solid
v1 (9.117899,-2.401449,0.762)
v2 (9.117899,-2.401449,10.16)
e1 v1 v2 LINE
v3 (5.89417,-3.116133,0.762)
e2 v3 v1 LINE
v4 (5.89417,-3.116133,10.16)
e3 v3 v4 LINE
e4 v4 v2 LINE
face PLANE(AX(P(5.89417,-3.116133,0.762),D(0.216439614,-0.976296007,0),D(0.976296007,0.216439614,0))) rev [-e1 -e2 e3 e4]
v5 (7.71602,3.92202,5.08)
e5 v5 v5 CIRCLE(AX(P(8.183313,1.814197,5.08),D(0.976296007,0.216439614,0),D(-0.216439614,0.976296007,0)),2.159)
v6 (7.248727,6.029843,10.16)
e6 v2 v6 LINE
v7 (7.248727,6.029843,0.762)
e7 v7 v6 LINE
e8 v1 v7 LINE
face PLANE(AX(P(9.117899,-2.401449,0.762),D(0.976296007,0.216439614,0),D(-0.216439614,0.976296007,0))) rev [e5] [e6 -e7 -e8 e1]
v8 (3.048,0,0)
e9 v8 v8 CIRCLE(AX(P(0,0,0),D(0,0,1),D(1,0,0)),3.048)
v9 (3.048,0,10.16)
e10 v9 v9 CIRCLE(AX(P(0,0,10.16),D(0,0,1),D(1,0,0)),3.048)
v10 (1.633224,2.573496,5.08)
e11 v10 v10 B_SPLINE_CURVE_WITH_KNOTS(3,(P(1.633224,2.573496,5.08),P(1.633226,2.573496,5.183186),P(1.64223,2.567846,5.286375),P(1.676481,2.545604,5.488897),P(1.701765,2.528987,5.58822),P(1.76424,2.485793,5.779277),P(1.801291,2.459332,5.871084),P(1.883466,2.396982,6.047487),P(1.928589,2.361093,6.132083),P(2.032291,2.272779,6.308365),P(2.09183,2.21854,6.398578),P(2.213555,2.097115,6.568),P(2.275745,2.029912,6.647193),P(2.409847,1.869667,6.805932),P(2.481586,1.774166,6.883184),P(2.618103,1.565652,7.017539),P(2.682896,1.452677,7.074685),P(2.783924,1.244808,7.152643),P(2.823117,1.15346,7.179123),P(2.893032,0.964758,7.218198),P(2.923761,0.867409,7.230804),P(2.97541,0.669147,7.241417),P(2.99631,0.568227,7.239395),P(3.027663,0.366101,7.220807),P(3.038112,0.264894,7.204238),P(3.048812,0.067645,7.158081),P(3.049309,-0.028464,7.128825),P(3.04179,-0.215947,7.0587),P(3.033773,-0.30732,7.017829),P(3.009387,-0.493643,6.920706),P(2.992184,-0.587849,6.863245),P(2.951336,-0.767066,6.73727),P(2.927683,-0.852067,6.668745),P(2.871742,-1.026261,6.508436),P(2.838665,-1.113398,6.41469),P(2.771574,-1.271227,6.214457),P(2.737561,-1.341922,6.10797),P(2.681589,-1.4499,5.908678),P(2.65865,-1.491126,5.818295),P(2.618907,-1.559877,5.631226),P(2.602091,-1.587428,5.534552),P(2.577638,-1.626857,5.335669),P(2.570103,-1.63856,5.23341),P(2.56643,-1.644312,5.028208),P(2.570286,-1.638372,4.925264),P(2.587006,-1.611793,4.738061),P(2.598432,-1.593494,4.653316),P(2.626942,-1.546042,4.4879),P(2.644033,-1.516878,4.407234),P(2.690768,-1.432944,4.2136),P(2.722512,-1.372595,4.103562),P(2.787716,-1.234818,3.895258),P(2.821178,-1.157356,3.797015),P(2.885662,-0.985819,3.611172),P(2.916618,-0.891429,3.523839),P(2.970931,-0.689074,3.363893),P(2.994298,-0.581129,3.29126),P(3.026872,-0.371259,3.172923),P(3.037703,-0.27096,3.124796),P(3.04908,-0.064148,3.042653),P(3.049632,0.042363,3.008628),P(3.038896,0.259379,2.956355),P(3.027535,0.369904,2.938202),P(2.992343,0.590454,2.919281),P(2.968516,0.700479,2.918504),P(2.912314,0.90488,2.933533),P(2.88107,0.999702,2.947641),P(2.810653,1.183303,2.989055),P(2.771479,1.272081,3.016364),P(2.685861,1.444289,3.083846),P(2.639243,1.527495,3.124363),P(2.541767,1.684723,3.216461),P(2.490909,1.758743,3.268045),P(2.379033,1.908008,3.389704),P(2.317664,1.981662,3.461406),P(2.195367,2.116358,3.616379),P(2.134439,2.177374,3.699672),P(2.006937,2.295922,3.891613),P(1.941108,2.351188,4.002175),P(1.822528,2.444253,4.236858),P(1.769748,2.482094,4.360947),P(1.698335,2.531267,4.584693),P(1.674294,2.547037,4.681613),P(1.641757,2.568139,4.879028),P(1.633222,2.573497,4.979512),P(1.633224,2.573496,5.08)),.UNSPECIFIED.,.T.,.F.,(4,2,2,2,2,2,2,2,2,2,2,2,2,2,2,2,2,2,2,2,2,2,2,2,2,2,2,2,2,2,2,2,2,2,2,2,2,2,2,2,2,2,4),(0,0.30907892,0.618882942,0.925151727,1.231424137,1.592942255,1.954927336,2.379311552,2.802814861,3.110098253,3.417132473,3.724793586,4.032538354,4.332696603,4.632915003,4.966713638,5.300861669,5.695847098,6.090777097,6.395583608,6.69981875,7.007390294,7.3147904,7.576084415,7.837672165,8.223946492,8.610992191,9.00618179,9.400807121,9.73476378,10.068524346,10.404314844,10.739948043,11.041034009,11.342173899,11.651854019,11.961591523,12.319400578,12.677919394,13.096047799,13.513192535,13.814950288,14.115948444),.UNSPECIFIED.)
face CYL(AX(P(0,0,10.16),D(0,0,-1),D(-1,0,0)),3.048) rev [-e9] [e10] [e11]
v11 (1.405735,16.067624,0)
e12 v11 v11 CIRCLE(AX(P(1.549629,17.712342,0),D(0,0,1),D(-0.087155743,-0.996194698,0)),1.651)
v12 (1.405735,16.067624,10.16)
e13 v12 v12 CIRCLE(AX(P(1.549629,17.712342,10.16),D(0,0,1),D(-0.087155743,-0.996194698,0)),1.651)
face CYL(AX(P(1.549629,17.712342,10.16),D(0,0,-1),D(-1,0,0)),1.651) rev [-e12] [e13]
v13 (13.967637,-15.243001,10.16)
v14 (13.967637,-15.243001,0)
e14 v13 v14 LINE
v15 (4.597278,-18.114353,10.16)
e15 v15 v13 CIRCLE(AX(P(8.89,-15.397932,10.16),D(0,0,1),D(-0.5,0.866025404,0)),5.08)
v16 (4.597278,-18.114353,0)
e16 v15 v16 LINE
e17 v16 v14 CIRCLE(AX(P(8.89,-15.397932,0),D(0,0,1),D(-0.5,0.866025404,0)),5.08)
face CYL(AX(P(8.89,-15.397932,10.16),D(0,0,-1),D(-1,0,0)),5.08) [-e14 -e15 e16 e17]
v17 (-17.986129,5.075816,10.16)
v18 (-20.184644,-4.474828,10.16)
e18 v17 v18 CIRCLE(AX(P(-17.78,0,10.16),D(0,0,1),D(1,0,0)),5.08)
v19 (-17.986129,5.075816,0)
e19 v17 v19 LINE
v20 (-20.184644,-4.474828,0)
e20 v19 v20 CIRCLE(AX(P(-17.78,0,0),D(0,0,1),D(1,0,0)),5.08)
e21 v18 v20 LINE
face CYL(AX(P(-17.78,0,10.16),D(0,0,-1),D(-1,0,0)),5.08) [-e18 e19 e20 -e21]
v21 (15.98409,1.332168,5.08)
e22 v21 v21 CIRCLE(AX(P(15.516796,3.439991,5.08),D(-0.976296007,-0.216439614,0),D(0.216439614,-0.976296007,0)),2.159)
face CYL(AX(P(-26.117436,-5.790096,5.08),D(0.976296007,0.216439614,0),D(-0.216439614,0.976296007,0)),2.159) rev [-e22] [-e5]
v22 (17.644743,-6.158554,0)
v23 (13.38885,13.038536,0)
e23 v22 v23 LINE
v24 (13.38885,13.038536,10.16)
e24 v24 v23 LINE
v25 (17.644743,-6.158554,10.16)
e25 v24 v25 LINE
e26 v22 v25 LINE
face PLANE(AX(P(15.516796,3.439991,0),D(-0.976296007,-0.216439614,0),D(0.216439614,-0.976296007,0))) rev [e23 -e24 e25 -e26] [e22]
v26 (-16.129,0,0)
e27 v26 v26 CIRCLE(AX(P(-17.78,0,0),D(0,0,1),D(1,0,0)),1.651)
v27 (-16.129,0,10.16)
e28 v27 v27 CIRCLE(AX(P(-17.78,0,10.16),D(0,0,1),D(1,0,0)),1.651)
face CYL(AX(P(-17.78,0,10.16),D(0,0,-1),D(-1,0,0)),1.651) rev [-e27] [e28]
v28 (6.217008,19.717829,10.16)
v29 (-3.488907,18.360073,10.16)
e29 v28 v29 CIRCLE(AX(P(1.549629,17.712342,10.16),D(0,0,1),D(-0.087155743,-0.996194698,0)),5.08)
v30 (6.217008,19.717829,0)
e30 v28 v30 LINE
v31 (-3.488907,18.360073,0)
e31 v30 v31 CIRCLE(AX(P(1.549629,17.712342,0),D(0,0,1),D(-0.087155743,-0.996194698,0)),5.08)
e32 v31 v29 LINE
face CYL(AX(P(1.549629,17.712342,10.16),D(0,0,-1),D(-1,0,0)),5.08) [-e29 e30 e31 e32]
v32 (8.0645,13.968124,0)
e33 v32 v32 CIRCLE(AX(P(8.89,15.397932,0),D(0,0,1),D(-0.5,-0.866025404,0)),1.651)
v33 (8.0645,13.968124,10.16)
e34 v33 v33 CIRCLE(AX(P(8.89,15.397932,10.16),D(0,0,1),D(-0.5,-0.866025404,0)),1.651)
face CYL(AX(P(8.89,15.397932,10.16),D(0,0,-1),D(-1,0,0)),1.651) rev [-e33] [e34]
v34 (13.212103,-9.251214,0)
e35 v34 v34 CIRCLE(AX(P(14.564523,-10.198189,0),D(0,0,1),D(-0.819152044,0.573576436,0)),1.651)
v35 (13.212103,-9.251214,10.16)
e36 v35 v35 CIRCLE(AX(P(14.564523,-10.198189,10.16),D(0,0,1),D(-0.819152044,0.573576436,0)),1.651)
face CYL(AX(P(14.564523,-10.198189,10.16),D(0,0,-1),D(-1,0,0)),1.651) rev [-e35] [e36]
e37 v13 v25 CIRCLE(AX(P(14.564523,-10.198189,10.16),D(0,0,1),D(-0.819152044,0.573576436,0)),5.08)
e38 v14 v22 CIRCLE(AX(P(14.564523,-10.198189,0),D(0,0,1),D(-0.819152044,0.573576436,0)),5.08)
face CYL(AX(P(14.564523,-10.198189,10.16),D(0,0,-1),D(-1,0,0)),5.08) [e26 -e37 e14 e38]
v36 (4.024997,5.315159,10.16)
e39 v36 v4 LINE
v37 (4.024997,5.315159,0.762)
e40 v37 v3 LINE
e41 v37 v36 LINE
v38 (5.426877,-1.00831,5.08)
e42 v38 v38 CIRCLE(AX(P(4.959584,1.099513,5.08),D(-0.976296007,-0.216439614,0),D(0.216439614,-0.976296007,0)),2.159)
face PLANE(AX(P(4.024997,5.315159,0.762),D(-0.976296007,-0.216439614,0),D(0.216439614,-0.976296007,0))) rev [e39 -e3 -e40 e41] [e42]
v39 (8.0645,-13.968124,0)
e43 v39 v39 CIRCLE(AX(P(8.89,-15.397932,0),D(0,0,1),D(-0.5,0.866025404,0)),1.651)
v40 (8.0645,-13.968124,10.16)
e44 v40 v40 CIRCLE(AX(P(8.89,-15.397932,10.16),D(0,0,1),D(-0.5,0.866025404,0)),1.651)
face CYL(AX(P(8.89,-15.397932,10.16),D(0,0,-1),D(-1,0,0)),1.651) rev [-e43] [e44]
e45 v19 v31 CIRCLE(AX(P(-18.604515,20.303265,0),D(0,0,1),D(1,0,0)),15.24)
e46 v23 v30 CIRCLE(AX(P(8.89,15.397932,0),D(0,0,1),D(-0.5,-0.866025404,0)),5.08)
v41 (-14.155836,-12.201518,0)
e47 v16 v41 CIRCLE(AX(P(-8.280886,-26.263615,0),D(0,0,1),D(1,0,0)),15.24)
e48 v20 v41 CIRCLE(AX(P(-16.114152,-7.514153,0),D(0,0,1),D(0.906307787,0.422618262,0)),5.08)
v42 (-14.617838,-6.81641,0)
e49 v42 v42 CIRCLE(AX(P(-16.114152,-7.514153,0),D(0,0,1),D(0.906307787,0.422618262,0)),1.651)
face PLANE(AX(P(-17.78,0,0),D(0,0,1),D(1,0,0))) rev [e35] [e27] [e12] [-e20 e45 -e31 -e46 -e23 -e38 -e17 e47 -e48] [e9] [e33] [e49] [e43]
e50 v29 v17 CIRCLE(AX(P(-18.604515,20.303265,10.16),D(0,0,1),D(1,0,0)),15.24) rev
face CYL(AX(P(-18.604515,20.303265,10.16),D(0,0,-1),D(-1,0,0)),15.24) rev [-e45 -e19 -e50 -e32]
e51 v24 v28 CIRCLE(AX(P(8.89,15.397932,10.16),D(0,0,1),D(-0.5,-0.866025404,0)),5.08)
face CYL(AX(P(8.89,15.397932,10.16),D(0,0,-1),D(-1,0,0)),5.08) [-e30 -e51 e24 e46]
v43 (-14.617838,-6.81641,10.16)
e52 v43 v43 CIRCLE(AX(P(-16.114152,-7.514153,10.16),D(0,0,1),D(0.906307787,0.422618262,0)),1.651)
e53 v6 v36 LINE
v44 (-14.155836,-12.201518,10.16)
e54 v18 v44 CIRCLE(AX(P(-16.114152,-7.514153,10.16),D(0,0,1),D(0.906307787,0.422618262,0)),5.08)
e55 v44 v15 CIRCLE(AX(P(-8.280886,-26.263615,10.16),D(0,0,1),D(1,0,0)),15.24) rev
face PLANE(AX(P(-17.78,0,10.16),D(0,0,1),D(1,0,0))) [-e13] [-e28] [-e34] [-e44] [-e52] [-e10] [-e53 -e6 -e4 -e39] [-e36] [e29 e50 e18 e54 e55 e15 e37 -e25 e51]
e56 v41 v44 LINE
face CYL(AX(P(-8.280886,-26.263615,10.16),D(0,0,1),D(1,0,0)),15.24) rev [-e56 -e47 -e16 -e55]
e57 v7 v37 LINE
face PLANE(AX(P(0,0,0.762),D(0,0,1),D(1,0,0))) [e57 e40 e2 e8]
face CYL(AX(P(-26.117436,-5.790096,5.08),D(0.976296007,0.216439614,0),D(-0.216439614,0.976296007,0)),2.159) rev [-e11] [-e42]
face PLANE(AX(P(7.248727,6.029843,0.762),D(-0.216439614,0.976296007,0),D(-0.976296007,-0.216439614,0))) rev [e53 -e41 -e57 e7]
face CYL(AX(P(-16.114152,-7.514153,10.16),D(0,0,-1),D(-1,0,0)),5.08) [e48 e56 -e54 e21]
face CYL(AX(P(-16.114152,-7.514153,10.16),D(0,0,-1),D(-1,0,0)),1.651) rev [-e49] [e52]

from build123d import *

# Parameters (mm, degrees)
SKETCH1_R                     = 3.048
SKETCH1_R_2                   = 1.651
BOSS_EXTRUDE1_DEPTH           = 10.16
CIRPATTERN1_COUNT             = 2
CIRPATTERN1_ANGLE             = 25
CIRPATTERN2_COUNT             = 3
CIRPATTERN2_COPY_1_SKETCH_R   = 3.048
CIRPATTERN2_COPY_1_SKETCH_R_2 = 1.651
CIRPATTERN2_COPY_1_DEPTH      = 10.16
CIRPATTERN2_COPY_2_SKETCH_R   = 3.048
CIRPATTERN2_COPY_2_SKETCH_R_2 = 1.651
CIRPATTERN2_COPY_2_DEPTH      = 10.16
FILLET1_R                     = 15.24
CUT_EXTRUDE1_DEPTH            = 9.398
BOSS_EXTRUDE3_REACH           = 49.452
SKETCH7_W                     = 10.16
SKETCH7_H                     = 19.663186572
CUT_EXTRUDE3_START            = -1.198457
SKETCH8_W                     = 10.16
SKETCH8_H                     = 19.663186572
CUT_EXTRUDE3_DEPTH            = 1.198457
CUT_EXTRUDE2_REACH            = 49.452
CUT_EXTRUDE2_END_RADIUS       = 3.048
SKETCH5_R                     = 2.159


with BuildPart() as part:
    # Sketch1 → Boss-Extrude1 (new body)
    with BuildSketch(Plane.XY):
        with BuildLine():
            Line((-17.78, 5.08), (0, 5.08))
            ThreePointArc((0, 5.08), (5.08, 0), (0, -5.08))
            Line((0, -5.08), (-17.78, -5.08))
            ThreePointArc((-17.78, -5.08), (-22.86, 0), (-17.78, 5.08))
        make_face()
        Circle(SKETCH1_R, mode=Mode.SUBTRACT)
        with Locations((-17.78, 0)):
            Circle(SKETCH1_R_2, mode=Mode.SUBTRACT)
    boss_extrude1 = extrude(amount=BOSS_EXTRUDE1_DEPTH)

    # CirPattern1: Boss-Extrude1 ×2 about axis
    cirpattern1_axis = Axis((0, 0, 10.16), (0, 0, 1))
    for i in range(1, CIRPATTERN1_COUNT):
        add(boss_extrude1.rotate(cirpattern1_axis, i * CIRPATTERN1_ANGLE / (CIRPATTERN1_COUNT - 1)))

    # CirPattern2: Boss-Extrude1 ×3 about axis
    cirpattern2_axis = Axis((0, 0, 0), (0, 0, 1))
    for i in range(1, CIRPATTERN2_COUNT):
        add(boss_extrude1.rotate(cirpattern2_axis, i * 360 / CIRPATTERN2_COUNT))

    # CirPattern2 copy 1 sketch → CirPattern2 copy 1 (add)
    with BuildSketch(Plane(origin=(0, 0, 0), x_dir=(-0.8191520442889921, 0.5735764363510454, 0), z_dir=(0, 0, 1))):
        with BuildLine():
            Line((-17.78, 5.08), (0, 5.08))
            ThreePointArc((0, 5.08), (5.08, 0), (0, -5.08))
            Line((0, -5.08), (-17.78, -5.08))
            ThreePointArc((-17.78, -5.08), (-22.86, 0), (-17.78, 5.08))
        make_face()
        Circle(CIRPATTERN2_COPY_1_SKETCH_R, mode=Mode.SUBTRACT)
        with Locations((-17.78, 0)):
            Circle(CIRPATTERN2_COPY_1_SKETCH_R_2, mode=Mode.SUBTRACT)
    extrude(amount=CIRPATTERN2_COPY_1_DEPTH)

    # CirPattern2 copy 2 sketch → CirPattern2 copy 2 (add)
    with BuildSketch(Plane(origin=(0, 0, 0), x_dir=(-0.0871557427476577, -0.9961946980917455, 0), z_dir=(0, 0, 1))):
        with BuildLine():
            Line((-17.78, 5.08), (0, 5.08))
            ThreePointArc((0, 5.08), (5.08, 0), (0, -5.08))
            Line((0, -5.08), (-17.78, -5.08))
            ThreePointArc((-17.78, -5.08), (-22.86, 0), (-17.78, 5.08))
        make_face()
        Circle(CIRPATTERN2_COPY_2_SKETCH_R, mode=Mode.SUBTRACT)
        with Locations((-17.78, 0)):
            Circle(CIRPATTERN2_COPY_2_SKETCH_R_2, mode=Mode.SUBTRACT)
    extrude(amount=CIRPATTERN2_COPY_2_DEPTH)

    # Fillet1
    # the kernel refuses this fillet: 15.24 mm, written as the material it adds along each edge
    with BuildSketch(Plane(origin=(-4.654962364, 5.08, 0), x_dir=(0.0874683738412008, 0.9961672969825781, 0), z_dir=(0, 0, 1)), Plane(origin=(6.726890233, 1.491315661, 0), x_dir=(0.81897199868559, -0.5738334822654828, 0), z_dir=(0, 0, 1))) as fillet1_piece_1:
        with BuildLine():
            CenterArc((13.944774221, 15.227642174), FILLET1_R, 187.343482599, 80.348997025)
            Line((-1.17022312, 13.279705988), (-2.681722854, 13.084912369))
            ThreePointArc((-2.681722854, 13.084912369), (-2.666184659, 12.941431463), (-1.518158961, -0.133301802))
            Line((-1.518158961, -0.133301802), (0.000478276, -1.523999925))
            ThreePointArc((0.000478276, -1.523999925), (13.125515266, -1.5198809), (13.269806265, -1.522764217))
            Line((13.269806265, -1.522764217), (13.331166988, 0))
        make_face()
    extrude(amount=10.16)
    with BuildSketch(Plane(origin=(-2.071927869, -6.571315661, 10.16), x_dir=(-0.9064403725267903, -0.4223338147170952, 0), z_dir=(0, 0, -1))) as fillet1_piece_2:
        with BuildLine():
            CenterArc((13.944774221, -15.227642174), FILLET1_R, 92.307520375, 80.348997025)
            Line((-1.17022312, -13.279705988), (-2.681722854, -13.084912369))
            ThreePointArc((-2.681722854, -13.084912369), (-2.666184659, -12.941431463), (-1.518158961, 0.133301802))
            Line((-1.518158961, 0.133301802), (0.000478276, 1.523999925))
            ThreePointArc((0.000478276, 1.523999925), (13.125515266, 1.5198809), (13.269806265, 1.522764217))
            Line((13.269806265, 1.522764217), (13.331166988, 0))
        make_face()
    extrude(amount=10.16)

    # Sketch4 → Cut-Extrude1 (cut)
    with BuildSketch(Plane.XY.offset(10.16)):
        Polygon((4.024997463, 5.315159398), (5.894169969, -3.11613292), (9.117899385, -2.401449315), (7.248726879, 6.029843003), align=None)
    extrude(amount=-CUT_EXTRUDE1_DEPTH, mode=Mode.SUBTRACT)

    # Sketch7 → Boss-Extrude3 (add, up to next)
    with BuildSketch(Plane(origin=(16.68684539, 3.699384559, 0), x_dir=(0, 0, -1), z_dir=(0.9762960071199317, 0.21643961393811023, 0)), mode=Mode.PRIVATE) as boss_extrude3_sk1:
        with Locations((-5.08, 0)):
            Rectangle(SKETCH7_W, SKETCH7_H)
    boss_extrude3_tool1 = extrude(boss_extrude3_sk1.sketch, amount=-BOSS_EXTRUDE3_REACH, mode=Mode.PRIVATE) - part.part
    add(boss_extrude3_tool1.solids().sort_by_distance((16.686845, 3.699385, 5.08))[0])

    # Sketch8 → Cut-Extrude3 (cut)
    with BuildSketch(Plane(origin=(16.68684539, 3.699384559, 0), x_dir=(0, 0, -1), z_dir=(0.9762960071199318, 0.2164396139381102, 0)).offset(CUT_EXTRUDE3_START)):
        with Locations((-5.08, 0)):
            Rectangle(SKETCH8_W, SKETCH8_H)
    extrude(amount=CUT_EXTRUDE3_DEPTH, mode=Mode.SUBTRACT)

    # Cut-Extrude2: up to this cylinder (the profile starts outside it)
    cut_extrude2_end = Plane(origin=(0, 0, 5.08), z_dir=(0, 0, -1)) * Cylinder(CUT_EXTRUDE2_END_RADIUS, 106, mode=Mode.PRIVATE)
    # Sketch5 → Cut-Extrude2 (cut, up to the surface)
    with BuildSketch(Plane(origin=(16.68684539, 3.699384559, 0), x_dir=(0, 0, -1), z_dir=(0.9762960071199317, 0.21643961393811023, 0)), mode=Mode.PRIVATE) as cut_extrude2_sk1:
        with Locations(Location((-5.08, 0, 0), (0, 0, 90))):
            Circle(SKETCH5_R)
    cut_extrude2_tool1 = extrude(cut_extrude2_sk1.sketch, amount=-CUT_EXTRUDE2_REACH, mode=Mode.PRIVATE) - cut_extrude2_end
    add(cut_extrude2_tool1.solids().sort_by_distance((16.686845, 3.699385, 5.08))[0], mode=Mode.SUBTRACT)


solid = part.part
